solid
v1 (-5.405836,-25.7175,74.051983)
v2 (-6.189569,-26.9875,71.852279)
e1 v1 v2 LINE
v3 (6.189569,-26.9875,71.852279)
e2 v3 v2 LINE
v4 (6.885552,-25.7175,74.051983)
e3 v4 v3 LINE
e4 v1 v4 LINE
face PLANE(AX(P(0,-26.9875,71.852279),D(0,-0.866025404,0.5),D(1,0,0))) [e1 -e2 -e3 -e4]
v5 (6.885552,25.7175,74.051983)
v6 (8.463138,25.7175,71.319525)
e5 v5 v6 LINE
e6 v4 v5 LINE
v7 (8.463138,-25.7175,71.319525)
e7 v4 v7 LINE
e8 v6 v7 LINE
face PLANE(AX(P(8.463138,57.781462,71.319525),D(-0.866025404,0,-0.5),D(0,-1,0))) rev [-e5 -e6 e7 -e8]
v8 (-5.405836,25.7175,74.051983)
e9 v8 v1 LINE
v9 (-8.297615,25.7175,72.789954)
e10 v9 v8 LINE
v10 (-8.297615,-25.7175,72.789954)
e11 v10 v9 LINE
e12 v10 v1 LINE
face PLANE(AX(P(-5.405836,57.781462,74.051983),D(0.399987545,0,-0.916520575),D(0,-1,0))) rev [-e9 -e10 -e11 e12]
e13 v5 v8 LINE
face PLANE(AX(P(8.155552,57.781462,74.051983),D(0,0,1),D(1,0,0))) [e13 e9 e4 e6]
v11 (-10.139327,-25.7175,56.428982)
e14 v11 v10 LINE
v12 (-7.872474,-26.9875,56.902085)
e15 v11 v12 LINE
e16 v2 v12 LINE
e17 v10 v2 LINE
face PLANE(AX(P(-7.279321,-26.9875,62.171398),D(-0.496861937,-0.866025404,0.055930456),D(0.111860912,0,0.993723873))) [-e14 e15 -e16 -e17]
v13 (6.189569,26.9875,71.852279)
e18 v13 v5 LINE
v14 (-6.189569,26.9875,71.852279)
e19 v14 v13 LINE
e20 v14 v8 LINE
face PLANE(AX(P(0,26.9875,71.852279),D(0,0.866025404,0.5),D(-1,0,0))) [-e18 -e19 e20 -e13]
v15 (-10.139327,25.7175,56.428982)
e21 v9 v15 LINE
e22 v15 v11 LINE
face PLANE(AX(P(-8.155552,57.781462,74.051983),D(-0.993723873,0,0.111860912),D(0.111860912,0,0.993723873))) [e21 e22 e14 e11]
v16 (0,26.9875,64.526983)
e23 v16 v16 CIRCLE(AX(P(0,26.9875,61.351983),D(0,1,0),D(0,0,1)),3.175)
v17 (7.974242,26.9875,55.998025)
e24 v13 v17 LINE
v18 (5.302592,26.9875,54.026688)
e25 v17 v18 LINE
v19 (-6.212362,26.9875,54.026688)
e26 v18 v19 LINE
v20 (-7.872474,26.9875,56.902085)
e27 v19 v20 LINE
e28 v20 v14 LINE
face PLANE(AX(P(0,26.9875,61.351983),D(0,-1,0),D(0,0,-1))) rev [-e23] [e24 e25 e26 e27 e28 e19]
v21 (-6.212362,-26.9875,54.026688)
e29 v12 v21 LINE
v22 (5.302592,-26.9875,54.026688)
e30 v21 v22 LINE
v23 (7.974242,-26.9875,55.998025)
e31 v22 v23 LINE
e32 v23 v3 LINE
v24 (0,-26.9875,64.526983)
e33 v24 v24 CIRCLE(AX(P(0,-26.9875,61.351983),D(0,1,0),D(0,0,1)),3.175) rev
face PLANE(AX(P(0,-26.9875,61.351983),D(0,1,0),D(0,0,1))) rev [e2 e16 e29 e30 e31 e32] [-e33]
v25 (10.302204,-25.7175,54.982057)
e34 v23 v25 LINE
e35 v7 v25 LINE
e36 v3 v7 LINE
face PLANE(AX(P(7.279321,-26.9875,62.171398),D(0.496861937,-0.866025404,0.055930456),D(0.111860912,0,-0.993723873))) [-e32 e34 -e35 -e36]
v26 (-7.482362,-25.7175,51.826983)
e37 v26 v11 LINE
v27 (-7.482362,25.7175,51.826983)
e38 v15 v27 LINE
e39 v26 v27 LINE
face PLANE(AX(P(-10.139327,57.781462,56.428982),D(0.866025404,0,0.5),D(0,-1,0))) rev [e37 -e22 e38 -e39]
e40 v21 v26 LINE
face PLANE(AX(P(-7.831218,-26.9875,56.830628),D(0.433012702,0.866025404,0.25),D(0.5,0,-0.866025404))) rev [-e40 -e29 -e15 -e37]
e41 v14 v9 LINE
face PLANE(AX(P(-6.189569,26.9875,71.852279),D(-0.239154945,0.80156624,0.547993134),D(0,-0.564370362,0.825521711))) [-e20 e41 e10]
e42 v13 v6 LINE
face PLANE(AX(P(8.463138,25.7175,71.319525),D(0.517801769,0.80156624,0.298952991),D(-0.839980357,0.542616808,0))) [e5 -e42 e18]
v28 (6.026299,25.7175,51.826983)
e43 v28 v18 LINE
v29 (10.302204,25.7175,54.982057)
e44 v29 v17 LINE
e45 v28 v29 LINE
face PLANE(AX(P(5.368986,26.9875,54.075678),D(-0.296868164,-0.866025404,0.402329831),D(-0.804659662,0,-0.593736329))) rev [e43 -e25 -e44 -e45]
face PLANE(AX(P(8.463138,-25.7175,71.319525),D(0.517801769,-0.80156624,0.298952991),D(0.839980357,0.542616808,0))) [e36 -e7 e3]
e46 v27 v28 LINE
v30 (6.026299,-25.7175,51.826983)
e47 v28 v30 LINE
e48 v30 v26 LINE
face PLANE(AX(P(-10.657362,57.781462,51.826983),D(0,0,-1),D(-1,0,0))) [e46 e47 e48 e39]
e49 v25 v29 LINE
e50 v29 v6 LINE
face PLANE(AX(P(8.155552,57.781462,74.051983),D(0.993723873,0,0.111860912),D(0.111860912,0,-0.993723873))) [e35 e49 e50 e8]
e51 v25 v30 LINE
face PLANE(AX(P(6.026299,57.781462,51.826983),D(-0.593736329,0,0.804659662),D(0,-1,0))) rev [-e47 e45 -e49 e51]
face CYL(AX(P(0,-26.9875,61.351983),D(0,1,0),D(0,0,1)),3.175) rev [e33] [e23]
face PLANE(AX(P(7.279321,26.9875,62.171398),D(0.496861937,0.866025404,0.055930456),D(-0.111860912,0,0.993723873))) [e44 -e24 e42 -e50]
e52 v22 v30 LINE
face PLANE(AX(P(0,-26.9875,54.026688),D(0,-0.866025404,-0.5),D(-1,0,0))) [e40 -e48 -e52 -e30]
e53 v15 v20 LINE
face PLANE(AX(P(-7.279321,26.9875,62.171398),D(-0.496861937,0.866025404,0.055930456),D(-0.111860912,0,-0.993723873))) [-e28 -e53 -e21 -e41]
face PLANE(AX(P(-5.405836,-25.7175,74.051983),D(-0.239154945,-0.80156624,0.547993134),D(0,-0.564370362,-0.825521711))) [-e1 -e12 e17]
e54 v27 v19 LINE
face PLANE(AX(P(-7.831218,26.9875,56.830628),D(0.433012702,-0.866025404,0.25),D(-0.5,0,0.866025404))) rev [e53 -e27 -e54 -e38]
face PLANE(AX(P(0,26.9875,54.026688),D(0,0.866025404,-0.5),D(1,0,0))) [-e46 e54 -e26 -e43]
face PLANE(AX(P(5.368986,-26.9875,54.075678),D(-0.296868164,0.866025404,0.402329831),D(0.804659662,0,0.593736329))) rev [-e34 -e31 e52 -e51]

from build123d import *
from OCP.BRepFilletAPI import BRepFilletAPI_MakeChamfer

# Parameters (mm, degrees)
SKETCH1_R           = 3.175
BOSS_EXTRUDE1_DEPTH = 53.975
CHAMFER1_SIZE       = 3.175
CHAMFER1_SIZE2      = 4.631063529
CHAMFER2_SIZE       = 1.27
CHAMFER2_SIZE2      = 2.749716278
CHAMFER2_SIZE2_2    = 2.199704526


# Read off the part's stored shape, not the designer's step: Imported1
with BuildPart() as part:
    # Sketch1 → Boss-Extrude1 (new body)
    with BuildSketch(Plane(origin=(0, -26.9875, 0), x_dir=(-1, 0, 0), z_dir=(0, -1, 0))):
        Polygon((-8.155551794, -74.05198332), (8.155551794, -74.05198332), (10.657362253, -51.82698332), (-10.657362253, -51.82698332), align=None)
        with Locations(Location((0, -61.35198332, 0), (0, 0, 270))):
            Circle(SKETCH1_R, mode=Mode.SUBTRACT)
    extrude(amount=-BOSS_EXTRUDE1_DEPTH)

    # Chamfer1: one chamfer whose edges measure the first distance from different faces: ONE call of the kernel's chamfer builder (chamfer() names one face for all edges)
    chamfer1_edges_1 = [part.edges().sort_by_distance(p)[0] for p in [
        (-10.657362253, 0, 51.82698332),
    ]]
    chamfer1_side_1 = [part.faces().sort_by_distance(p)[0] for p in [
        (0, 0, 51.82698332),
    ]]
    chamfer1_edges_2 = [part.edges().sort_by_distance(p)[0] for p in [
        (10.657362253, 0, 51.82698332),
    ]]
    chamfer1_side_2 = [part.faces().sort_by_distance(p)[0] for p in [
        (9.406457023, 0, 62.93948332),
    ]]
    chamfer1 = BRepFilletAPI_MakeChamfer(part.part.solid().wrapped)
    for e in chamfer1_edges_1:
        chamfer1.Add(CHAMFER1_SIZE, CHAMFER1_SIZE2, e.wrapped, chamfer1_side_1[0].wrapped)  # the first distance lies on this face
    for e in chamfer1_edges_2:
        chamfer1.Add(CHAMFER1_SIZE, CHAMFER1_SIZE2, e.wrapped, chamfer1_side_2[0].wrapped)  # the first distance lies on this face
    add(Compound.cast(chamfer1.Shape()), mode=Mode.REPLACE)

    # Chamfer2: one chamfer whose edges measure the first distance from different faces: ONE call of the kernel's chamfer builder (chamfer() names one face for all edges)
    chamfer2_edges_1 = [part.edges().sort_by_distance(p)[0] for p in [
        (8.155551794, 0, 74.05198332),
    ]]
    chamfer2_side_1 = [part.faces().sort_by_distance(p)[0] for p in [
        (0, 0, 74.05198332),
    ]]
    chamfer2_edges_2 = [part.edges().sort_by_distance(p)[0] for p in [
        (-9.147439527, -26.9875, 65.240482514),
        (-9.147439527, 26.9875, 65.240482514),
    ]]
    chamfer2_side_2 = [part.faces().sort_by_distance(p)[0] for p in [
        (-9.147439527, 0, 65.240482514),
    ]]
    chamfer2_edges_3 = [part.edges().sort_by_distance(p)[0] for p in [
        (0, -26.9875, 74.05198332),
        (0, 26.9875, 74.05198332),
    ]]
    chamfer2_side_3 = [part.faces().sort_by_distance(p)[0] for p in [
        (0, 0, 74.05198332),
    ]]
    chamfer2_edges_4 = [part.edges().sort_by_distance(p)[0] for p in [
        (9.228877825, 26.9875, 64.517019969),
        (9.228877825, -26.9875, 64.517019969),
    ]]
    chamfer2_side_4 = [part.faces().sort_by_distance(p)[0] for p in [
        (9.228877825, 0, 64.517019969),
    ]]
    chamfer2_edges_5 = [part.edges().sort_by_distance(p)[0] for p in [
        (-8.155551794, 0, 74.05198332),
    ]]
    chamfer2_side_5 = [part.faces().sort_by_distance(p)[0] for p in [
        (-9.147439527, 0, 65.240482514),
    ]]
    chamfer2_edges_6 = [part.edges().sort_by_distance(p)[0] for p in [
        (-0.728031765, -26.9875, 51.82698332),
        (-0.728031765, 26.9875, 51.82698332),
    ]]
    chamfer2_side_6 = [part.faces().sort_by_distance(p)[0] for p in [
        (-0.728031765, 0, 51.82698332),
    ]]
    chamfer2_edges_7 = [part.edges().sort_by_distance(p)[0] for p in [
        (8.16425129, -26.9875, 53.404519969),
        (8.16425129, 26.9875, 53.404519969),
    ]]
    chamfer2_side_7 = [part.faces().sort_by_distance(p)[0] for p in [
        (8.16425129, 0, 53.404519969),
    ]]
    chamfer2_edges_8 = [part.edges().sort_by_distance(p)[0] for p in [
        (-8.810844757, -26.9875, 54.127982514),
        (-8.810844757, 26.9875, 54.127982514),
    ]]
    chamfer2_side_8 = [part.faces().sort_by_distance(p)[0] for p in [
        (-8.810844757, 0, 54.127982514),
    ]]
    chamfer2 = BRepFilletAPI_MakeChamfer(part.part.solid().wrapped)
    for e in chamfer2_edges_1:
        chamfer2.Add(CHAMFER2_SIZE, CHAMFER2_SIZE2, e.wrapped, chamfer2_side_1[0].wrapped)  # the first distance lies on this face
    for e in chamfer2_edges_2:
        chamfer2.Add(CHAMFER2_SIZE, CHAMFER2_SIZE2_2, e.wrapped, chamfer2_side_2[0].wrapped)  # the first distance lies on this face
    for e in chamfer2_edges_3:
        chamfer2.Add(CHAMFER2_SIZE, CHAMFER2_SIZE2_2, e.wrapped, chamfer2_side_3[0].wrapped)  # the first distance lies on this face
    for e in chamfer2_edges_4:
        chamfer2.Add(CHAMFER2_SIZE, CHAMFER2_SIZE2_2, e.wrapped, chamfer2_side_4[0].wrapped)  # the first distance lies on this face
    for e in chamfer2_edges_5:
        chamfer2.Add(CHAMFER2_SIZE, CHAMFER2_SIZE2, e.wrapped, chamfer2_side_5[0].wrapped)  # the first distance lies on this face
    for e in chamfer2_edges_6:
        chamfer2.Add(CHAMFER2_SIZE, CHAMFER2_SIZE2_2, e.wrapped, chamfer2_side_6[0].wrapped)  # the first distance lies on this face
    for e in chamfer2_edges_7:
        chamfer2.Add(CHAMFER2_SIZE, CHAMFER2_SIZE2_2, e.wrapped, chamfer2_side_7[0].wrapped)  # the first distance lies on this face
    for e in chamfer2_edges_8:
        chamfer2.Add(CHAMFER2_SIZE, CHAMFER2_SIZE2_2, e.wrapped, chamfer2_side_8[0].wrapped)  # the first distance lies on this face
    add(Compound.cast(chamfer2.Shape()), mode=Mode.REPLACE)


solid = part.part
